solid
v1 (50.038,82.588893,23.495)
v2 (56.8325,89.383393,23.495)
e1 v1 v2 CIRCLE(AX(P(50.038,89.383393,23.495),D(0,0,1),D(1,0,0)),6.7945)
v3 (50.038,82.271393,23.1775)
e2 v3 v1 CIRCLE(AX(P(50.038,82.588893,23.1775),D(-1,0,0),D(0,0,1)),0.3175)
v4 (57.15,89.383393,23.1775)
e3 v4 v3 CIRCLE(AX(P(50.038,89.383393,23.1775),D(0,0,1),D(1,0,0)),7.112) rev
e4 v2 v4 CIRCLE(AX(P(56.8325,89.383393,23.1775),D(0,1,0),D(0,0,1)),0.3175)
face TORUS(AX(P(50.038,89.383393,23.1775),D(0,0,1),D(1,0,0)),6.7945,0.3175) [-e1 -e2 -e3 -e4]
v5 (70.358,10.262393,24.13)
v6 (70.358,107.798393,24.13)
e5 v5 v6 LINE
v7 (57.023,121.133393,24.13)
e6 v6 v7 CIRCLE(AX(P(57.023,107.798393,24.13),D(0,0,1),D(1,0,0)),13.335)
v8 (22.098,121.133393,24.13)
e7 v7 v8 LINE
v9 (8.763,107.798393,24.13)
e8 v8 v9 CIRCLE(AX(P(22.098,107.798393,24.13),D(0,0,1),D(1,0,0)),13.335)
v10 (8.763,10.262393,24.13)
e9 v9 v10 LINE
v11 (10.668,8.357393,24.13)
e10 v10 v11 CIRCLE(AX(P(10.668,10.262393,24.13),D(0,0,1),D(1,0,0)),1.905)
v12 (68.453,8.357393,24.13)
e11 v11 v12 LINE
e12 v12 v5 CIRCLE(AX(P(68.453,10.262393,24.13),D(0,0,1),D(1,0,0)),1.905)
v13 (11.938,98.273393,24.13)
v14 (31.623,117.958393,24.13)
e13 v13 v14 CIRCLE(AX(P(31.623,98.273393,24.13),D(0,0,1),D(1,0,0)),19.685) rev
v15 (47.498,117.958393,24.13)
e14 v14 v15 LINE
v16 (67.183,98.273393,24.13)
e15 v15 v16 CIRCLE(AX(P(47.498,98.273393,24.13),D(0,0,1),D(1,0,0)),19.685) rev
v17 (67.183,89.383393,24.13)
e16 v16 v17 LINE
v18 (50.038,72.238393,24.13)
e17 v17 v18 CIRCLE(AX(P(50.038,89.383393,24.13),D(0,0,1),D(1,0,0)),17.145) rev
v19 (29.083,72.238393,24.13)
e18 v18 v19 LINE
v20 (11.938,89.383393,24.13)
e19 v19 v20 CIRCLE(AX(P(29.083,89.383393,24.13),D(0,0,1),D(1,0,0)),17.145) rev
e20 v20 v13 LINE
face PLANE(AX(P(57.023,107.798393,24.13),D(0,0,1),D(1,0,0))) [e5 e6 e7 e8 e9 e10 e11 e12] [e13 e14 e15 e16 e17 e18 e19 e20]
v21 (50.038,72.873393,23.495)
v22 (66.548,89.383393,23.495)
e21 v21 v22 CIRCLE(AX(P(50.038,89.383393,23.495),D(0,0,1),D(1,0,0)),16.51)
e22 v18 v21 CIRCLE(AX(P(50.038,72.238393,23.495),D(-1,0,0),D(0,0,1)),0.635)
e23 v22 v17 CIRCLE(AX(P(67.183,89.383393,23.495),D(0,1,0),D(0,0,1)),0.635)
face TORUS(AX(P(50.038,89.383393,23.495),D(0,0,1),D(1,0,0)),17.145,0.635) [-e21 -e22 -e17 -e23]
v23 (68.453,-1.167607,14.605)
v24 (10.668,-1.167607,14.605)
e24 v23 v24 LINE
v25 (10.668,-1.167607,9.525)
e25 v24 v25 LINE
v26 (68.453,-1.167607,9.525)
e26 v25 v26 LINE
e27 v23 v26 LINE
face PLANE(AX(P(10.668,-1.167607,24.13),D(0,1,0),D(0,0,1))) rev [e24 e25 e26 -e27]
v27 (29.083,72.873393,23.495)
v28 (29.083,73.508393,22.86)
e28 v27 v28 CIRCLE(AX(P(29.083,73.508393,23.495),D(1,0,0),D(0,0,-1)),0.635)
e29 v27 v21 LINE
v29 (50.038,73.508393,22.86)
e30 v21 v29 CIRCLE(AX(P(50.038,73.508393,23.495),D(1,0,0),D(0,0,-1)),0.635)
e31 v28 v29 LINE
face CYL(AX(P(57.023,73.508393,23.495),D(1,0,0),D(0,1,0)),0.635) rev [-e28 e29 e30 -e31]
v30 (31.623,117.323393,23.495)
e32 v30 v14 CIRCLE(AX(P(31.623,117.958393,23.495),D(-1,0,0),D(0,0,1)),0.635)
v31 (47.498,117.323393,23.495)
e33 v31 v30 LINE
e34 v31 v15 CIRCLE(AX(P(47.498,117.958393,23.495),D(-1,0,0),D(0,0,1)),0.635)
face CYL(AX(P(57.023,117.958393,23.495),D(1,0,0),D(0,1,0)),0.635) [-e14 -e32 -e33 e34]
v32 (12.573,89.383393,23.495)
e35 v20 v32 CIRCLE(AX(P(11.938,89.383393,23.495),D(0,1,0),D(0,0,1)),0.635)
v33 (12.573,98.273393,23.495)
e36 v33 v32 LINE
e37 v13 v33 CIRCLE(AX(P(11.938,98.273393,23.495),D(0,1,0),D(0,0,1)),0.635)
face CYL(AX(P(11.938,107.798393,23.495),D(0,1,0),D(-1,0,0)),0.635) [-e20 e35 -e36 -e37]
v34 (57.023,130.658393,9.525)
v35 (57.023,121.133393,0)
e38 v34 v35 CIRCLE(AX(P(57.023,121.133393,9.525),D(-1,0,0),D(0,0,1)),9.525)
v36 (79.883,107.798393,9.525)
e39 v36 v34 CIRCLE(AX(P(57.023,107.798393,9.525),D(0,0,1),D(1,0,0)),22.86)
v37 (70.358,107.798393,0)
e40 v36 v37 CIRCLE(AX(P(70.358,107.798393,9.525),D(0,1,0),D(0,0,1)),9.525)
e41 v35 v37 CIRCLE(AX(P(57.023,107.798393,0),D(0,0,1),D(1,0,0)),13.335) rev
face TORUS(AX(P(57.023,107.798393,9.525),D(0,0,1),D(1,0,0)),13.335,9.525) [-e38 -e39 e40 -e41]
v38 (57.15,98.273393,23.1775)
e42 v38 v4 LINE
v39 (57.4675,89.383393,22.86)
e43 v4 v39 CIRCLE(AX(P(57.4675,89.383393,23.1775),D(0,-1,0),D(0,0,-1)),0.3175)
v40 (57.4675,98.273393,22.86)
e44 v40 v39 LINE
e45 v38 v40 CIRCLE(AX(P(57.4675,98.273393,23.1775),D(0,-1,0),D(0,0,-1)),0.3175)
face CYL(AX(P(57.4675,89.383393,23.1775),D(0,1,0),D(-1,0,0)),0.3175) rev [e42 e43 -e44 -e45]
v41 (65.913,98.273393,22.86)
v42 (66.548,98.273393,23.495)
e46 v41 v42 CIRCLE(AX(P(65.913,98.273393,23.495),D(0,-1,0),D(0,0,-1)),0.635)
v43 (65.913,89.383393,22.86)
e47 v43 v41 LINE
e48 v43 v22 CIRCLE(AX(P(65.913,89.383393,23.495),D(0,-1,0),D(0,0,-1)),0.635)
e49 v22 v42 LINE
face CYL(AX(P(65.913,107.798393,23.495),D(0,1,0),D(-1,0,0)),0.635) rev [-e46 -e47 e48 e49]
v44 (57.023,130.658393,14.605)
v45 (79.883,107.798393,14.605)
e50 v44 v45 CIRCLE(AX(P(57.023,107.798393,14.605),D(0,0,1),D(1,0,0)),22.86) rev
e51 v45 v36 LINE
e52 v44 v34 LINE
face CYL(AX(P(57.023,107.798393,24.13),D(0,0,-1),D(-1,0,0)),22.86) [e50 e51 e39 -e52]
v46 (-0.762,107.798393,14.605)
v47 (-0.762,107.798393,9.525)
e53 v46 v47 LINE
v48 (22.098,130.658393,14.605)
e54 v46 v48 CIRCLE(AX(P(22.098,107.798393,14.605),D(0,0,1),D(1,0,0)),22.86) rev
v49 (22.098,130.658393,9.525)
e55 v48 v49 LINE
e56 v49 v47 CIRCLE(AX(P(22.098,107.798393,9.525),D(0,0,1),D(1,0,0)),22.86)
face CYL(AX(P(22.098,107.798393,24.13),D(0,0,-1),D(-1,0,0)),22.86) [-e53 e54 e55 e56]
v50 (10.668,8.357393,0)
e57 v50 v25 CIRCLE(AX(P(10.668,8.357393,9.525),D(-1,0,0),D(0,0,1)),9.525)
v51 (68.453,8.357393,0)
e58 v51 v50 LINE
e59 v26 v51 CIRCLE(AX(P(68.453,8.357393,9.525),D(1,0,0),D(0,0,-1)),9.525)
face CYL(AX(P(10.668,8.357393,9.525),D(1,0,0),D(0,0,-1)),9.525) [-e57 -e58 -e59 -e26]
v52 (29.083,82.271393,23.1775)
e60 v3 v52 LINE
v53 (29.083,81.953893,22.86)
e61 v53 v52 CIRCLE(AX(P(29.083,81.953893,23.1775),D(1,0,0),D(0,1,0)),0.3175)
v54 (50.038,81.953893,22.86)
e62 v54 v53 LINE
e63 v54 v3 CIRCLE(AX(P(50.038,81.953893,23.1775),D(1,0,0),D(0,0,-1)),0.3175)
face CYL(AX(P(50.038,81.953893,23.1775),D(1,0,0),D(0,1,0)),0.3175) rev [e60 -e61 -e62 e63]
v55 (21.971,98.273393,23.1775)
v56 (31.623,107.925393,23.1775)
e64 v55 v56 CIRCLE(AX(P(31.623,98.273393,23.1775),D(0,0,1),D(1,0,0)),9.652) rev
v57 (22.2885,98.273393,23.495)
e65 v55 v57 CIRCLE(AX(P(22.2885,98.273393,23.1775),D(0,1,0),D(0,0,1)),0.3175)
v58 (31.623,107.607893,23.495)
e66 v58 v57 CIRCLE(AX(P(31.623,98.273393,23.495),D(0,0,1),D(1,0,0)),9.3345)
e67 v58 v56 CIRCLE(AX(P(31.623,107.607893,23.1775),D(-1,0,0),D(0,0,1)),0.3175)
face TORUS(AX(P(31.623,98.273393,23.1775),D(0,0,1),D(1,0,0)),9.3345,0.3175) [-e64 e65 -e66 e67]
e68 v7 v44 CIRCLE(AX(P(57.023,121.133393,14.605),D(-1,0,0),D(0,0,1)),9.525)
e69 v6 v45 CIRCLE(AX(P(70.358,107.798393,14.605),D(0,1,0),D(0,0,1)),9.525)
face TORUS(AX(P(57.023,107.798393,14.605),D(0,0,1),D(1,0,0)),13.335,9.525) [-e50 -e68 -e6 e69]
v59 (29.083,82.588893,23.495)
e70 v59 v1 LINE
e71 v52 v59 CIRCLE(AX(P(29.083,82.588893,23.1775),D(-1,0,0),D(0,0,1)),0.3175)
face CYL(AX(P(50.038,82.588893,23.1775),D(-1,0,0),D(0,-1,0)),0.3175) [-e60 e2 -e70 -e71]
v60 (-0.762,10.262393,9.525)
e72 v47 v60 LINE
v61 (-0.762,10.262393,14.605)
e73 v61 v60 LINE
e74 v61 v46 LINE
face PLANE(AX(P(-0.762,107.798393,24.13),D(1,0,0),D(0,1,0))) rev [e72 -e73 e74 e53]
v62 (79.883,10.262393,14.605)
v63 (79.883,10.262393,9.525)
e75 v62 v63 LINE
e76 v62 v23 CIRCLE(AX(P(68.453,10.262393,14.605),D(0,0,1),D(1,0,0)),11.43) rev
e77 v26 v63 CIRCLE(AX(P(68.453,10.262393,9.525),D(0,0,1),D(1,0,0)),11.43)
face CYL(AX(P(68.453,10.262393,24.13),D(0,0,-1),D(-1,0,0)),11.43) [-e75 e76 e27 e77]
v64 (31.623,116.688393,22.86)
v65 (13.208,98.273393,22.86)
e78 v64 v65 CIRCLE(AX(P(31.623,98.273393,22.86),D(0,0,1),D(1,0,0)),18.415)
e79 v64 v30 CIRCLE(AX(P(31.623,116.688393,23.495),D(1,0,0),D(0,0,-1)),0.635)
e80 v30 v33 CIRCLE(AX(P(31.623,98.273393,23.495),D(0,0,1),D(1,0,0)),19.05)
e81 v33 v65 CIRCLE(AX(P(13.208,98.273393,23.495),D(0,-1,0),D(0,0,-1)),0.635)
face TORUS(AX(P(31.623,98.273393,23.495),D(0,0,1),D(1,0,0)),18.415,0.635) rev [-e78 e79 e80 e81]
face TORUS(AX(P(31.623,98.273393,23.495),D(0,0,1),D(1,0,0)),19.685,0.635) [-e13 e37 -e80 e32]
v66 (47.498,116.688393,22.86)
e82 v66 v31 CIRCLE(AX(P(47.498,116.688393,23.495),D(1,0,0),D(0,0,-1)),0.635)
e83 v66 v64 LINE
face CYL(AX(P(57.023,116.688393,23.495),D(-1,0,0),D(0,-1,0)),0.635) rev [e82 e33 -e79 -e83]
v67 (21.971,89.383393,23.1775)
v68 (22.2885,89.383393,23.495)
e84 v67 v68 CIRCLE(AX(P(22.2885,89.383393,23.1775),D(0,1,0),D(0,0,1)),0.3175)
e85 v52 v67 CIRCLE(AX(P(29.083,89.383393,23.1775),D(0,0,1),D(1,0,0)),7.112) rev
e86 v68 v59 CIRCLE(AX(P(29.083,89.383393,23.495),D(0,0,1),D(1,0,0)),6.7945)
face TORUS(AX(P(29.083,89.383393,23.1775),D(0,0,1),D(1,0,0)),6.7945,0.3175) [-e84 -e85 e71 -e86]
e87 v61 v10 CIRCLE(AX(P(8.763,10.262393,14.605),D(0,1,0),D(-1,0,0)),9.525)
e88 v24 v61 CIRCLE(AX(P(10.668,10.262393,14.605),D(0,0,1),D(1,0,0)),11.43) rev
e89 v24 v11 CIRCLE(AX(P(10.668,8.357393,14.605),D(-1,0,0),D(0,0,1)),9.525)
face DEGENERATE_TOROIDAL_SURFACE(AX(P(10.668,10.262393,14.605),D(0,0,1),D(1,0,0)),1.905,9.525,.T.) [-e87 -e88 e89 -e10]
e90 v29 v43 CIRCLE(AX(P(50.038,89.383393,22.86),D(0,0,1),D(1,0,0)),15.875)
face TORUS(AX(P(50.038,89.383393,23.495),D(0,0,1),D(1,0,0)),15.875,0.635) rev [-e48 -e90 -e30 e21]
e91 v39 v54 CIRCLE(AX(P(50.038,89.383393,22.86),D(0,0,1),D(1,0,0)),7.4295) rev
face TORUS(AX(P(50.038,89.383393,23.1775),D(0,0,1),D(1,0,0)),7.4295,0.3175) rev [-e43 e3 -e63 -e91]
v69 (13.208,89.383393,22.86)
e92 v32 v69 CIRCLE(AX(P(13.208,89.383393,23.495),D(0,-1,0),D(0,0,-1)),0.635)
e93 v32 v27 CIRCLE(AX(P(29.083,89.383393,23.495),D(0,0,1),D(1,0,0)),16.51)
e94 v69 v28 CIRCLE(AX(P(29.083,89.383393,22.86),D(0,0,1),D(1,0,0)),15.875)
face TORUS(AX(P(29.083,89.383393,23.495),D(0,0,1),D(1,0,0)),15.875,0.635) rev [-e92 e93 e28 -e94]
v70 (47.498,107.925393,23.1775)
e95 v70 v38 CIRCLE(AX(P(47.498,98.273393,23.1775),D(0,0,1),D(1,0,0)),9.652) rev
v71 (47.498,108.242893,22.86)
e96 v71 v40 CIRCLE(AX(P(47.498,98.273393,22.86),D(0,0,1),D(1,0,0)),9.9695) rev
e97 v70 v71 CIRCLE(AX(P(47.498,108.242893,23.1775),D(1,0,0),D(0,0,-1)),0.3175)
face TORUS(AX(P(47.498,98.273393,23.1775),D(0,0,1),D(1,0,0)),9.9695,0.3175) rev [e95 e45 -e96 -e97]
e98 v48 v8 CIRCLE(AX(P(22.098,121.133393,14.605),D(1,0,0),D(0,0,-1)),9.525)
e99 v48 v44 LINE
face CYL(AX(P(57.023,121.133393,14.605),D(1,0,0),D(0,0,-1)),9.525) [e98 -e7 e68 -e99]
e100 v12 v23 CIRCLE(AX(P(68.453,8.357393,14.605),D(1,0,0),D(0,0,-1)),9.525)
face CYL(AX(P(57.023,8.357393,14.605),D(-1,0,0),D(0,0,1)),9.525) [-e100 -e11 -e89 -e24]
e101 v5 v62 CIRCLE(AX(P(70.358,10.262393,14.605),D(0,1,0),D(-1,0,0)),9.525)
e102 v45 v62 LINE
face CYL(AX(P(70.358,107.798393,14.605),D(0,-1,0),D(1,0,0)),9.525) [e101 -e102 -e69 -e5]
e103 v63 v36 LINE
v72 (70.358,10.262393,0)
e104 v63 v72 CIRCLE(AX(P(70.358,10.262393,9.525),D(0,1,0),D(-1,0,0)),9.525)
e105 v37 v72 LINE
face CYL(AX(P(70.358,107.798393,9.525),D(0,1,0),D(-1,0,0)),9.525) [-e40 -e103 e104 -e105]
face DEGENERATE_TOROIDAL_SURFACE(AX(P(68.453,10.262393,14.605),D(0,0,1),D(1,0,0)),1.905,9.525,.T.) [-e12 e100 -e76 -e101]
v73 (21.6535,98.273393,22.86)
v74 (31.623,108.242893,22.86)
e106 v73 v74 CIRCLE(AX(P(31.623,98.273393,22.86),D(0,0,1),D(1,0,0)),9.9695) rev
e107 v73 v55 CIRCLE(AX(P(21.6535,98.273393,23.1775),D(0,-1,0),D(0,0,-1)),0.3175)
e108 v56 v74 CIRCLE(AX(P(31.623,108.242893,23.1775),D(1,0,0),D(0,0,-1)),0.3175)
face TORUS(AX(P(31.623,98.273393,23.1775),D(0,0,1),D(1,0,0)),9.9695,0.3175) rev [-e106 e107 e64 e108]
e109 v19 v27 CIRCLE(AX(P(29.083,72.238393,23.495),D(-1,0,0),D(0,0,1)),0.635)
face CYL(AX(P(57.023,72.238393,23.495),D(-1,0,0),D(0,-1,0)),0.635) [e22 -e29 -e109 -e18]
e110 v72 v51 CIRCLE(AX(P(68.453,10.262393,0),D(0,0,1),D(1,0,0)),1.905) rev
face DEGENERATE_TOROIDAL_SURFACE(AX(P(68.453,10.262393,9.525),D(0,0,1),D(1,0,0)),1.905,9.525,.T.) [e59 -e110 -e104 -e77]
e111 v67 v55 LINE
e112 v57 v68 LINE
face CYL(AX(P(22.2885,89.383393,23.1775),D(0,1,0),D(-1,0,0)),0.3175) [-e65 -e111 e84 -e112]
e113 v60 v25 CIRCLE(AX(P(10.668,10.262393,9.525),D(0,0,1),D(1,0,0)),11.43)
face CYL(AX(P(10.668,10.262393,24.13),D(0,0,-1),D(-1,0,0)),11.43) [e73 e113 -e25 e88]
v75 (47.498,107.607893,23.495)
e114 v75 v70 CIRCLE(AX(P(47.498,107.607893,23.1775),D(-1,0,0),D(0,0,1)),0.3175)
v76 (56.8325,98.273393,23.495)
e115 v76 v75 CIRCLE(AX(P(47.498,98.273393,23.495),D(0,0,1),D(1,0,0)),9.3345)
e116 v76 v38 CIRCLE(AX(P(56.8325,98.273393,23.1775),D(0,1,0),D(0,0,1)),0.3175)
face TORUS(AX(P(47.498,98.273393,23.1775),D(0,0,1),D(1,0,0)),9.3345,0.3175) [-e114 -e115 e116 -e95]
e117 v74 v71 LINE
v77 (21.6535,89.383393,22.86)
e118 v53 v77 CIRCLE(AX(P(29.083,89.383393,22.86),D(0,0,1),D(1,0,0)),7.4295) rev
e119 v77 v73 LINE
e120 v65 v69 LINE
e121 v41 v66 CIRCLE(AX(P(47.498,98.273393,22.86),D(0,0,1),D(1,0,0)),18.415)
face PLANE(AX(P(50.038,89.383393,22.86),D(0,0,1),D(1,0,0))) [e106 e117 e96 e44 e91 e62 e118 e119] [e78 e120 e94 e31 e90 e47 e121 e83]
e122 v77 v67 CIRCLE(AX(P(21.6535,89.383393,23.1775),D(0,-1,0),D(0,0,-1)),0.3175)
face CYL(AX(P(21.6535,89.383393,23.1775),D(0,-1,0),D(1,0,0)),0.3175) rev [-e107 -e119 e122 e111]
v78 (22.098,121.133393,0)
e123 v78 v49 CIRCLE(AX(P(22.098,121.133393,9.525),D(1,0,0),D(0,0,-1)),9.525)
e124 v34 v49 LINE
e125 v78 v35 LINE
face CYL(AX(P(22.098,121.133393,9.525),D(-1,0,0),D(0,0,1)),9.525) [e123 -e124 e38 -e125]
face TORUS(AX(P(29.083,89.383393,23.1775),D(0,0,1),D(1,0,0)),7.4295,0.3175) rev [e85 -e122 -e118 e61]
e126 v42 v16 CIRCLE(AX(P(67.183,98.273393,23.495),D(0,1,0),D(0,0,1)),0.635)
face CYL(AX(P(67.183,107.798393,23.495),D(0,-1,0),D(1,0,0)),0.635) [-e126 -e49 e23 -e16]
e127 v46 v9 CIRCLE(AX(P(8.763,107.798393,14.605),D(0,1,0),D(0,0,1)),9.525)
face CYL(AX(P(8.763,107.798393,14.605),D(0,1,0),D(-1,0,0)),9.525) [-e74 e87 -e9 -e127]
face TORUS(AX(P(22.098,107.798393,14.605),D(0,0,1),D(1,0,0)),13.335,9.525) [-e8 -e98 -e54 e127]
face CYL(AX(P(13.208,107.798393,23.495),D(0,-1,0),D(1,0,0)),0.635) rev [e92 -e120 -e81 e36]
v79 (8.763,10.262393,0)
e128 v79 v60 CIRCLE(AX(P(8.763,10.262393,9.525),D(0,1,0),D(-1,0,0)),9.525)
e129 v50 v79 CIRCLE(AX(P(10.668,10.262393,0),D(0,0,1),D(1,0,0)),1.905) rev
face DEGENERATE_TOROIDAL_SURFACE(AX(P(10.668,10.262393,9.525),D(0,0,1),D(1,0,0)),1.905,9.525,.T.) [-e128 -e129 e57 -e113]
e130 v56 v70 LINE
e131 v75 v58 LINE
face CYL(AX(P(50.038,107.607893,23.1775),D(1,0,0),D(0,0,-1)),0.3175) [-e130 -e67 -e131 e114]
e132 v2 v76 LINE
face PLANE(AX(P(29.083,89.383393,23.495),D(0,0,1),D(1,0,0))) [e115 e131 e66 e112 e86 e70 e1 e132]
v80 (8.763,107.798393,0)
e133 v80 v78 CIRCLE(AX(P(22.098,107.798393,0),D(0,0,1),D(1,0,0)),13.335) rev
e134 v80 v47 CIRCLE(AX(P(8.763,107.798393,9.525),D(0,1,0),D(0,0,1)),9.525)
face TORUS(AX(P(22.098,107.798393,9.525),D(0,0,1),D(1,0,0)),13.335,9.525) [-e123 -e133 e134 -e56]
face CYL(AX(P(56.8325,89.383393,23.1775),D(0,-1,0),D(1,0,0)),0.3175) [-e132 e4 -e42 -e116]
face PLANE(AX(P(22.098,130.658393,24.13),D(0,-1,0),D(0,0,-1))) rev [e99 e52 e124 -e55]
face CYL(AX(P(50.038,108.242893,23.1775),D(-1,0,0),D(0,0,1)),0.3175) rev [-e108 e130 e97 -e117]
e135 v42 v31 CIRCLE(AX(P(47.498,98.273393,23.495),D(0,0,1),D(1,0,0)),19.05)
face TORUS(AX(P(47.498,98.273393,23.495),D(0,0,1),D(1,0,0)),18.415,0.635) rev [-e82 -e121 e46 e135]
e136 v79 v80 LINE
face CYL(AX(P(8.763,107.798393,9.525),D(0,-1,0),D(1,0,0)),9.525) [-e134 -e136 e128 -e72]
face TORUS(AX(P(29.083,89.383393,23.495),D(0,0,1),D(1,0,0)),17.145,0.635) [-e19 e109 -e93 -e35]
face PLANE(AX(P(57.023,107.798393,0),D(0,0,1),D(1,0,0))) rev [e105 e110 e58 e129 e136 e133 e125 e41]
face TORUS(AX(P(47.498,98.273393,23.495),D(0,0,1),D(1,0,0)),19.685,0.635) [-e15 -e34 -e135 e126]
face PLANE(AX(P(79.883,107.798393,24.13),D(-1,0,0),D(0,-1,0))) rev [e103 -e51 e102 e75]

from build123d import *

# Parameters (mm, degrees)
BOSS_EXTRUDE1_DEPTH = 24.13
FILLET3_R           = 9.525
CUT_EXTRUDE1_DEPTH  = 1.27
BOSS_EXTRUDE3_START = 22.86
BOSS_EXTRUDE3_DEPTH = 0.635
FILLET4_R           = 0.635
BOSS_EXTRUDE2_DEPTH = 0.635
FILLET6_R           = 0.3175


# Read off the part's stored shape, not the designer's step: Boss-Extrude3
with BuildPart() as part:
    # Sketch1 → Boss-Extrude1 (new body)
    with BuildSketch(Plane.XY):
        with BuildLine():
            Line((10.668, -1.16760682), (68.453, -1.16760682))
            ThreePointArc((68.453, -1.16760682), (76.535230509, 2.180162671), (79.883, 10.26239318))
            Line((79.883, 10.26239318), (79.883, 107.79839318))
            ThreePointArc((79.883, 107.79839318), (73.187461018, 123.962854198), (57.023, 130.65839318))
            Line((57.023, 130.65839318), (22.098, 130.65839318))
            ThreePointArc((22.098, 130.65839318), (5.933538982, 123.962854198), (-0.762, 107.79839318))
            Line((-0.762, 107.79839318), (-0.762, 10.26239318))
            ThreePointArc((-0.762, 10.26239318), (2.585769491, 2.180162671), (10.668, -1.16760682))
        make_face()
    extrude(amount=BOSS_EXTRUDE1_DEPTH)

    # Fillet3
    fillet3_edges = [part.edges().sort_by_distance(p)[0] for p in [
        (5.933538982, 123.962854198, 24.13),
        (39.5605, 130.65839318, 0),
        (73.187461018, 123.962854198, 0),
        (-0.762, 59.03039318, 24.13),
        (2.585769491, 2.180162671, 24.13),
        (39.5605, -1.16760682, 24.13),
        (76.535230509, 2.180162671, 24.13),
        (79.883, 59.03039318, 24.13),
        (73.187461018, 123.962854198, 24.13),
        (39.5605, 130.65839318, 24.13),
        (79.883, 59.03039318, 0),
        (76.535230509, 2.180162671, 0),
        (39.5605, -1.16760682, 0),
        (2.585769491, 2.180162671, 0),
        (-0.762, 59.03039318, 0),
        (5.933538982, 123.962854198, 0),
    ]]
    fillet(fillet3_edges, radius=FILLET3_R)

    # Sketch3 → Cut-Extrude1 (cut)
    with BuildSketch(Plane.XY.offset(24.13)):
        with BuildLine():
            Line((12.573, 98.27339318), (12.573, 89.38339318))
            ThreePointArc((12.573, 89.38339318), (17.408667043, 77.709060222), (29.083, 72.87339318))
            Line((29.083, 72.87339318), (50.038, 72.87339318))
            ThreePointArc((50.038, 72.87339318), (61.712332957, 77.709060222), (66.548, 89.38339318))
            Line((66.548, 89.38339318), (66.548, 98.27339318))
            ThreePointArc((66.548, 98.27339318), (60.968384182, 111.743777361), (47.498, 117.32339318))
            Line((47.498, 117.32339318), (31.623, 117.32339318))
            ThreePointArc((31.623, 117.32339318), (18.152615818, 111.743777361), (12.573, 98.27339318))
        make_face()
    extrude(amount=-CUT_EXTRUDE1_DEPTH, mode=Mode.SUBTRACT)

    # Boss-Extrude3 outline → Boss-Extrude3 (add)
    with BuildSketch(Plane.XY.offset(BOSS_EXTRUDE3_START)):
        with BuildLine():
            ThreePointArc((21.971, 89.38339318), (24.054056572, 84.354449752), (29.083, 82.27139318))
            Line((29.083, 82.27139318), (50.038, 82.27139318))
            ThreePointArc((50.038, 82.27139318), (55.066943428, 84.354449752), (57.15, 89.38339318))
            Line((57.15, 89.38339318), (57.15, 98.27339318))
            ThreePointArc((57.15, 98.27339318), (54.322994652, 105.098387832), (47.498, 107.92539318))
            Line((47.498, 107.92539318), (31.623, 107.92539318))
            ThreePointArc((31.623, 107.92539318), (24.798005348, 105.098387832), (21.971, 98.27339318))
            Line((21.971, 98.27339318), (21.971, 89.38339318))
        make_face()
    extrude(amount=BOSS_EXTRUDE3_DEPTH)

    # Fillet4
    fillet4_edges = [part.edges().sort_by_distance(p)[0] for p in [
        (18.152615818, 111.743777361, 22.86),
        (12.573, 93.82839318, 22.86),
        (17.408667043, 77.709060222, 22.86),
        (39.5605, 72.87339318, 22.86),
        (61.712332957, 77.709060222, 22.86),
        (66.548, 93.82839318, 22.86),
        (60.968384182, 111.743777361, 22.86),
        (39.5605, 117.32339318, 24.13),
        (60.968384182, 111.743777361, 24.13),
        (66.548, 93.82839318, 24.13),
        (61.712332957, 77.709060222, 24.13),
        (39.5605, 72.87339318, 24.13),
        (17.408667043, 77.709060222, 24.13),
        (12.573, 93.82839318, 24.13),
        (39.5605, 117.32339318, 22.86),
        (18.152615818, 111.743777361, 24.13),
    ]]
    fillet(fillet4_edges, radius=FILLET4_R - 0.0001)  # a hair under: the kernel refuses the full size

    # Sketch4 → Boss-Extrude2 (add)
    with BuildSketch(Plane.XY.offset(22.86)):
        with BuildLine():
            Line((57.15, 89.38339318), (57.15, 98.27339318))
            ThreePointArc((57.15, 98.27339318), (54.322994652, 105.098387832), (47.498, 107.92539318))
            Line((47.498, 107.92539318), (31.623, 107.92539318))
            ThreePointArc((31.623, 107.92539318), (24.798005348, 105.098387832), (21.971, 98.27339318))
            Line((21.971, 98.27339318), (21.971, 89.38339318))
            ThreePointArc((21.971, 89.38339318), (24.054056572, 84.354449752), (29.083, 82.27139318))
            Line((29.083, 82.27139318), (50.038, 82.27139318))
            ThreePointArc((50.038, 82.27139318), (55.066943428, 84.354449752), (57.15, 89.38339318))
        make_face()
    extrude(amount=BOSS_EXTRUDE2_DEPTH)

    # Fillet6
    fillet6_edges = [part.edges().sort_by_distance(p)[0] for p in [
        (24.798005348, 105.098387832, 22.86),
        (21.971, 93.82839318, 22.86),
        (24.054056572, 84.354449752, 22.86),
        (39.5605, 82.27139318, 22.86),
        (55.066943428, 84.354449752, 22.86),
        (57.15, 93.82839318, 22.86),
        (54.322994652, 105.098387832, 22.86),
        (21.971, 93.82839318, 23.495),
        (24.798005348, 105.098387832, 23.495),
        (39.5605, 107.92539318, 23.495),
        (54.322994652, 105.098387832, 23.495),
        (57.15, 93.82839318, 23.495),
        (55.066943428, 84.354449752, 23.495),
        (39.5605, 82.27139318, 23.495),
        (24.054056572, 84.354449752, 23.495),
        (39.5605, 107.92539318, 22.86),
    ]]
    fillet(fillet6_edges, radius=FILLET6_R - 0.0001)  # a hair under: the kernel refuses the full size


solid = part.part
